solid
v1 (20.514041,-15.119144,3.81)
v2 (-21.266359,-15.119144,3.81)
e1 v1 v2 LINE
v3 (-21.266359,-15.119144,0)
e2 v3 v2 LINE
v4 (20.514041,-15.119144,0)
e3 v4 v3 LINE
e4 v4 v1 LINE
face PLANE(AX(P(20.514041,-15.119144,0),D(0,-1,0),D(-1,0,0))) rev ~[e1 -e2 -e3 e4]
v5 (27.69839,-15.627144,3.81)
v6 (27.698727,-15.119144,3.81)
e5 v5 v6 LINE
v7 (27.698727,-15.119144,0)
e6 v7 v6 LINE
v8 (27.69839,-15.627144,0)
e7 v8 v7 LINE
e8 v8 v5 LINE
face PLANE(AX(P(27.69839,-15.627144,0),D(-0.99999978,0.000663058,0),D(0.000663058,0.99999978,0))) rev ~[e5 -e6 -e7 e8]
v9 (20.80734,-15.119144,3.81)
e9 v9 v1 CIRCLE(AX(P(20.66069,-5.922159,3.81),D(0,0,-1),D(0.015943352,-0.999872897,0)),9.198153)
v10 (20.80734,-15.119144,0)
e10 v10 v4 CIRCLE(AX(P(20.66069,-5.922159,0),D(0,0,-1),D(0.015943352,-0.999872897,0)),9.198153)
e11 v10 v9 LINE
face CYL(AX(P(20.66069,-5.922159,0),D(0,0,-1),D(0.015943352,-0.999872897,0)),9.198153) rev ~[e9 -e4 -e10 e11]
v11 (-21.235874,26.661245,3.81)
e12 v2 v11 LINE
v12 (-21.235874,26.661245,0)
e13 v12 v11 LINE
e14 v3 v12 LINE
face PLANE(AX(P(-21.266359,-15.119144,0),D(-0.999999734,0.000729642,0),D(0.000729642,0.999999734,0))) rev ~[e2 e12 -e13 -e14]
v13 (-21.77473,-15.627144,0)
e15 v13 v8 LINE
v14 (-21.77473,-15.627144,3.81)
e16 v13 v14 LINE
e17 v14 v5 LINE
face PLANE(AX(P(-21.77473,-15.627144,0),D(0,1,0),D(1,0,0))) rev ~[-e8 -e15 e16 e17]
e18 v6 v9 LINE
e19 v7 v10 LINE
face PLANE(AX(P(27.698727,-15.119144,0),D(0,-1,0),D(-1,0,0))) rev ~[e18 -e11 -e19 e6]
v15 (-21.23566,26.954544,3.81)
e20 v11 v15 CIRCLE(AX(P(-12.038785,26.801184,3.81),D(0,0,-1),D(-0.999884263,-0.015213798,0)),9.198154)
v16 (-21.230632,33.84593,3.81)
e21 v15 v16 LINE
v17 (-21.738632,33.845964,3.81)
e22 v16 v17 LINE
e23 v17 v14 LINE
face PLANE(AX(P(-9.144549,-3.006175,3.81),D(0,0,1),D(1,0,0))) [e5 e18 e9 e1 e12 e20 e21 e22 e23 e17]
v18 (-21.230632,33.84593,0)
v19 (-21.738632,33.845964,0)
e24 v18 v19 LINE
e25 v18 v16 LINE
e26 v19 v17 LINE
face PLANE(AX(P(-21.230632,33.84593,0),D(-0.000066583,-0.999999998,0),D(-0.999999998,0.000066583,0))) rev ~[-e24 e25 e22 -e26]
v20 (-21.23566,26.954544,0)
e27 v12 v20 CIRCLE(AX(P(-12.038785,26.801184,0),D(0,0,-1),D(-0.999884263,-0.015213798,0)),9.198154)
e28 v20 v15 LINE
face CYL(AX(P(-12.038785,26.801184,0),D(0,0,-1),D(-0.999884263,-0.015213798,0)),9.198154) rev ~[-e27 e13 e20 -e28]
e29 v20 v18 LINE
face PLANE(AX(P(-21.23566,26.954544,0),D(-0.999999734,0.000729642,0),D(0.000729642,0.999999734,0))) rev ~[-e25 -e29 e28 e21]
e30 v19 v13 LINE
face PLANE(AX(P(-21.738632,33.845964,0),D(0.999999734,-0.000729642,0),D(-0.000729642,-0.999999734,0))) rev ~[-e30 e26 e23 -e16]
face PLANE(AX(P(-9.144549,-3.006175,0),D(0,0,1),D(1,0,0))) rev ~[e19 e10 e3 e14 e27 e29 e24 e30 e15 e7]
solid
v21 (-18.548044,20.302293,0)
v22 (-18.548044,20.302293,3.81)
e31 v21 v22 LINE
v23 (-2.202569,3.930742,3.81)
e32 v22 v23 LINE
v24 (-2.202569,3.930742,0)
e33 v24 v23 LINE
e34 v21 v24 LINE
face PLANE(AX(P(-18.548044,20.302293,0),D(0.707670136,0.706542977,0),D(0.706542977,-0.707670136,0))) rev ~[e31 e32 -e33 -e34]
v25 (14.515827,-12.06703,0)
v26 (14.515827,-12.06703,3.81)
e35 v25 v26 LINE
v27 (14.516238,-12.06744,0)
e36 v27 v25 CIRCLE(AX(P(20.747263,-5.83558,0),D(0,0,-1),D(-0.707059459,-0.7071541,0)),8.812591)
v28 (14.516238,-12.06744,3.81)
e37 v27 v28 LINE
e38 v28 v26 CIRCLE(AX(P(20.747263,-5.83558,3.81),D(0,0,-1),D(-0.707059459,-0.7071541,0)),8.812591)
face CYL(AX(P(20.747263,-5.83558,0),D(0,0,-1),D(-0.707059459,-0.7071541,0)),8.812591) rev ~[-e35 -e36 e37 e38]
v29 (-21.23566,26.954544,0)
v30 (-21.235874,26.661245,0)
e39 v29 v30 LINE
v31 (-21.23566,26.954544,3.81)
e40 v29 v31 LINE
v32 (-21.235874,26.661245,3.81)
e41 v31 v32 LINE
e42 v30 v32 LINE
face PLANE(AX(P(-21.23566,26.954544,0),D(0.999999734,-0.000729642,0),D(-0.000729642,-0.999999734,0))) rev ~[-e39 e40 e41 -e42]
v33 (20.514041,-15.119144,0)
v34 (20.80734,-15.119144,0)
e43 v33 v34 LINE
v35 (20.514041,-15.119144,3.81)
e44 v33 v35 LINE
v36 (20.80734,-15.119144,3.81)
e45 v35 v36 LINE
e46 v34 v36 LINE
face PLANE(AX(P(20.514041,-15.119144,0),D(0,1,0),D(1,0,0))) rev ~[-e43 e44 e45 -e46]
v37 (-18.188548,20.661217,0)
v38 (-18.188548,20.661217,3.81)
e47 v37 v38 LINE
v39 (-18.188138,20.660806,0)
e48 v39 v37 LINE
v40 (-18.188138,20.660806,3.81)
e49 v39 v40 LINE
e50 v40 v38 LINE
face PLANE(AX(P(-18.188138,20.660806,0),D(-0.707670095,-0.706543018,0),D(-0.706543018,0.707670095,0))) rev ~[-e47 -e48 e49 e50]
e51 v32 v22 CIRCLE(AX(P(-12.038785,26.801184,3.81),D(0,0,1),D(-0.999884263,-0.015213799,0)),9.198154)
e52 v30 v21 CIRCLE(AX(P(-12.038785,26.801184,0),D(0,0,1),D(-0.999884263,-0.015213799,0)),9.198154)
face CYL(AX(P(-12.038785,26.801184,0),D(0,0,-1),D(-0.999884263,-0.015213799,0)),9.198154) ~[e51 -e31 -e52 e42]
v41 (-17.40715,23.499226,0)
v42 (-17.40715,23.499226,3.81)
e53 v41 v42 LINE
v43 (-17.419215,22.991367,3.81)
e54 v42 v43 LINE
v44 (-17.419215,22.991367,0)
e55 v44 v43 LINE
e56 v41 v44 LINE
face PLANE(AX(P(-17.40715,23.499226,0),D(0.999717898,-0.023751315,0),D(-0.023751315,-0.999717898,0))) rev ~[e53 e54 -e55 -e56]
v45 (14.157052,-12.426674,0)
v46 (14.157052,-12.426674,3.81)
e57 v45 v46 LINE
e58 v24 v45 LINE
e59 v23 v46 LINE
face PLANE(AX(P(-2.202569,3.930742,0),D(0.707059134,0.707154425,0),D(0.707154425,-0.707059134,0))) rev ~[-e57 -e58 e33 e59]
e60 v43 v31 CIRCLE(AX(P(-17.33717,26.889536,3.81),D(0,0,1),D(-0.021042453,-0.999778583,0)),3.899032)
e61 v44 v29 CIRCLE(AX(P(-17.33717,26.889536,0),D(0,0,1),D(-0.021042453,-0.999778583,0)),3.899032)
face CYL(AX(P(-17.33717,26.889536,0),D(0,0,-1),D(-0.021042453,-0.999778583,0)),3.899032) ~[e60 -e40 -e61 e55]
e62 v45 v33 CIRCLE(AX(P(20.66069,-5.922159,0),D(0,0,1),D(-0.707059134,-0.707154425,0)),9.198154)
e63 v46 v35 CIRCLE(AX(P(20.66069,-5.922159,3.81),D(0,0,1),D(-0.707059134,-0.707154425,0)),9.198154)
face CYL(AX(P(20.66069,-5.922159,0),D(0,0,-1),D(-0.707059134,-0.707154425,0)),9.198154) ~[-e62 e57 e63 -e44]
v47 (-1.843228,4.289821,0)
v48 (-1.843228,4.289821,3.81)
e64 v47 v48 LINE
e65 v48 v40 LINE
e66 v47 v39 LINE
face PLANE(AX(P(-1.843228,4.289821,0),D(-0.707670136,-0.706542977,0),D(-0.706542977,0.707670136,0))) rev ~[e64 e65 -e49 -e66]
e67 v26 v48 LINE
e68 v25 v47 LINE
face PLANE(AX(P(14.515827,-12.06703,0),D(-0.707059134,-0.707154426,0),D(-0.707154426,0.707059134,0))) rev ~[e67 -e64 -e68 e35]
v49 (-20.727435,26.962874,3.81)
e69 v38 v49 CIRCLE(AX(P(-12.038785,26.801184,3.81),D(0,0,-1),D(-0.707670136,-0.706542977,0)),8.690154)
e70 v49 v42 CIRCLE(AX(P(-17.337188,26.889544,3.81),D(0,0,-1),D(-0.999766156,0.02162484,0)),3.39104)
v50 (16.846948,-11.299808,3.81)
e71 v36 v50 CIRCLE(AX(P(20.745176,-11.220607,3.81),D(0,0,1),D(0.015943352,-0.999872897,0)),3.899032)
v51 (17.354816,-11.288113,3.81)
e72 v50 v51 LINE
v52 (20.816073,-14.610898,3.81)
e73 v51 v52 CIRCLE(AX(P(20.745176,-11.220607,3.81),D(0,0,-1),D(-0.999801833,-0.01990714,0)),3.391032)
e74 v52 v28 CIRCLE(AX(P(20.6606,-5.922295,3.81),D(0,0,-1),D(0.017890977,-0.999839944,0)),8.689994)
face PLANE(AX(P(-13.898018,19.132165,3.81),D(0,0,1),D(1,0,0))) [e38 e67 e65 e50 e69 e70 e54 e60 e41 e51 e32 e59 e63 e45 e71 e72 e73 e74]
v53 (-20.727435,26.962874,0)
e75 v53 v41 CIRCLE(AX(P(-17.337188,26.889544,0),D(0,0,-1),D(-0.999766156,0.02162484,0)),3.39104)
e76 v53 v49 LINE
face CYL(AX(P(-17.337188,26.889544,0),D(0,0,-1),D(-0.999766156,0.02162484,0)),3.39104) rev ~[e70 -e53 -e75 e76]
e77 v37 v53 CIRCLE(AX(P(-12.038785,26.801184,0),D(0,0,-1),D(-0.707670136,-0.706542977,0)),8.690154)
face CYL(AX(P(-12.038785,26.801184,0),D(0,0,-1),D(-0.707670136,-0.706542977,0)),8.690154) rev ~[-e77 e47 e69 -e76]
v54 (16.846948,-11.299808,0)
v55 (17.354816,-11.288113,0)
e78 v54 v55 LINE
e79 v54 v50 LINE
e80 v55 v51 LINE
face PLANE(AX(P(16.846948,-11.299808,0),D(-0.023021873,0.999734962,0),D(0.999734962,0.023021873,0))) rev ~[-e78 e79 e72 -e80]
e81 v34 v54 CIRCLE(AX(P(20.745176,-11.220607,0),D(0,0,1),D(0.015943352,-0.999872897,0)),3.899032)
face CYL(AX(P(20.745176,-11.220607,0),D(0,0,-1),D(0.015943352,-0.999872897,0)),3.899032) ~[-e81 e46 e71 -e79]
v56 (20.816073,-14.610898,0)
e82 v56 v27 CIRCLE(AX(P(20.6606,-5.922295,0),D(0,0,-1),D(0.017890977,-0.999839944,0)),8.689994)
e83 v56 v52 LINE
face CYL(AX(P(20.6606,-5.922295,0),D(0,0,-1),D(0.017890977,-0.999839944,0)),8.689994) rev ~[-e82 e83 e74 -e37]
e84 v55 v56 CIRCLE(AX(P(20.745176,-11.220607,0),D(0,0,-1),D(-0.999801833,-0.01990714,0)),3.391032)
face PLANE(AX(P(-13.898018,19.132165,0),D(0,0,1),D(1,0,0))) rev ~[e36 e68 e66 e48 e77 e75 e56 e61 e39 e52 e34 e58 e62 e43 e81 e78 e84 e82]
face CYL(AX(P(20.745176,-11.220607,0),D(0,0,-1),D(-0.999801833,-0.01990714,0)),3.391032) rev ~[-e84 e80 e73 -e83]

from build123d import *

# Parameters (mm, degrees)
F1_DEPTH = 3.81


# Not quite as in the source:
# - ends of sketch curves that miss each other by under 0.0002 mm in the source are joined


with BuildPart() as f1:
    # F0 (on Top) → F1 (new body)
    with BuildSketch(Plane.XY):
        with BuildLine():
            Line((20.5140408279, -15.1191436985), (-21.2663591647, -15.1191436985))
            Line((-21.2663591647, -15.1191436985), (-21.2358744499, 26.6612451727))
            ThreePointArc((-21.2358744499, 26.6612451727), (-21.2369365638, 26.8078953852), (-21.2356604469, 26.9545438918))
            Line((-21.2356604469, 26.9545438918), (-21.2306322042, 33.8459297569))
            Line((-21.2306322042, 33.8459297569), (-21.7386323148, 33.8459635813))
            Line((-21.7386323148, 33.8459635813), (-21.7747299579, -15.6271436985))
            Line((-21.7747299579, -15.6271436985), (27.6983904911, -15.6271436985))
            Line((27.6983904911, -15.6271436985), (27.6987273246, -15.1191436985))
            Line((27.6987273246, -15.1191436985), (20.8073396251, -15.1191436985))
            ThreePointArc((20.8073396251, -15.1191436985), (20.6606902265, -15.1203128143), (20.5140408279, -15.1191436985))
        make_face()
    extrude(amount=F1_DEPTH)


with BuildPart() as f1b:
    # F0 (on Top) → F1, piece 2 (new body)
    with BuildSketch(Plane.XY):
        with BuildLine():
            Line((-18.5480440044, 20.3022931542), (-2.2025689312, 3.9307418728))
            Line((-2.2025689312, 3.9307418728), (-1.8432276294, 4.2898210799))
            Line((-1.8432276294, 4.2898210799), (-18.1881377204, 20.6608064779))
            Line((-18.1881377204, 20.6608064779), (-18.1885475751, 20.6612169864))
            ThreePointArc((-18.1885475751, 20.6612169864), (-20.0993272211, 23.553656443), (-20.727434667, 26.9628742275))
            ThreePointArc((-20.727434667, 26.9628742275), (-14.8892020702, 29.236140209), (-17.4071495964, 23.4992255697))
            Line((-17.4071495964, 23.4992255697), (-17.4192153155, 22.9913667341))
            ThreePointArc((-17.4192153155, 22.9913667341), (-14.5286368513, 29.5940863142), (-21.2356604469, 26.9545438918))
            Line((-21.2356604469, 26.9545438918), (-21.2358744499, 26.6612451727))
            ThreePointArc((-21.2358744499, 26.6612451727), (-20.5111762537, 23.2200357251), (-18.5480440044, 20.3022931542))
        make_face()
        with BuildLine():
            Line((-1.8432276294, 4.2898210799), (-2.2025689312, 3.9307418728))
            Line((-2.2025689312, 3.9307418728), (14.1570516549, -12.4266742131))
            ThreePointArc((14.1570516549, -12.4266742131), (17.0733610662, -14.3919348459), (20.5140408279, -15.1191436985))
            Line((20.5140408279, -15.1191436985), (20.8073396251, -15.1191436985))
            ThreePointArc((20.8073396251, -15.1191436985), (23.4517750679, -8.414047808), (16.8469481592, -11.2998078844))
            Line((16.8469481592, -11.2998078844), (17.3548156633, -11.2881127234))
            ThreePointArc((17.3548156633, -11.2881127234), (23.0935659746, -8.7743517586), (20.8160725307, -14.6108980778))
            ThreePointArc((20.8160725307, -14.6108980778), (17.4072821975, -13.9803293465), (14.516237695, -12.0674397652))
            ThreePointArc((14.516237695, -12.0674397652), (14.5160325938, -12.0672346847), (14.5158274993, -12.0670295974))
            Line((14.5158274993, -12.0670295974), (-1.8432276294, 4.2898210799))
        make_face()
    extrude(amount=F1_DEPTH)


solid = Compound([f1.part, f1b.part])
